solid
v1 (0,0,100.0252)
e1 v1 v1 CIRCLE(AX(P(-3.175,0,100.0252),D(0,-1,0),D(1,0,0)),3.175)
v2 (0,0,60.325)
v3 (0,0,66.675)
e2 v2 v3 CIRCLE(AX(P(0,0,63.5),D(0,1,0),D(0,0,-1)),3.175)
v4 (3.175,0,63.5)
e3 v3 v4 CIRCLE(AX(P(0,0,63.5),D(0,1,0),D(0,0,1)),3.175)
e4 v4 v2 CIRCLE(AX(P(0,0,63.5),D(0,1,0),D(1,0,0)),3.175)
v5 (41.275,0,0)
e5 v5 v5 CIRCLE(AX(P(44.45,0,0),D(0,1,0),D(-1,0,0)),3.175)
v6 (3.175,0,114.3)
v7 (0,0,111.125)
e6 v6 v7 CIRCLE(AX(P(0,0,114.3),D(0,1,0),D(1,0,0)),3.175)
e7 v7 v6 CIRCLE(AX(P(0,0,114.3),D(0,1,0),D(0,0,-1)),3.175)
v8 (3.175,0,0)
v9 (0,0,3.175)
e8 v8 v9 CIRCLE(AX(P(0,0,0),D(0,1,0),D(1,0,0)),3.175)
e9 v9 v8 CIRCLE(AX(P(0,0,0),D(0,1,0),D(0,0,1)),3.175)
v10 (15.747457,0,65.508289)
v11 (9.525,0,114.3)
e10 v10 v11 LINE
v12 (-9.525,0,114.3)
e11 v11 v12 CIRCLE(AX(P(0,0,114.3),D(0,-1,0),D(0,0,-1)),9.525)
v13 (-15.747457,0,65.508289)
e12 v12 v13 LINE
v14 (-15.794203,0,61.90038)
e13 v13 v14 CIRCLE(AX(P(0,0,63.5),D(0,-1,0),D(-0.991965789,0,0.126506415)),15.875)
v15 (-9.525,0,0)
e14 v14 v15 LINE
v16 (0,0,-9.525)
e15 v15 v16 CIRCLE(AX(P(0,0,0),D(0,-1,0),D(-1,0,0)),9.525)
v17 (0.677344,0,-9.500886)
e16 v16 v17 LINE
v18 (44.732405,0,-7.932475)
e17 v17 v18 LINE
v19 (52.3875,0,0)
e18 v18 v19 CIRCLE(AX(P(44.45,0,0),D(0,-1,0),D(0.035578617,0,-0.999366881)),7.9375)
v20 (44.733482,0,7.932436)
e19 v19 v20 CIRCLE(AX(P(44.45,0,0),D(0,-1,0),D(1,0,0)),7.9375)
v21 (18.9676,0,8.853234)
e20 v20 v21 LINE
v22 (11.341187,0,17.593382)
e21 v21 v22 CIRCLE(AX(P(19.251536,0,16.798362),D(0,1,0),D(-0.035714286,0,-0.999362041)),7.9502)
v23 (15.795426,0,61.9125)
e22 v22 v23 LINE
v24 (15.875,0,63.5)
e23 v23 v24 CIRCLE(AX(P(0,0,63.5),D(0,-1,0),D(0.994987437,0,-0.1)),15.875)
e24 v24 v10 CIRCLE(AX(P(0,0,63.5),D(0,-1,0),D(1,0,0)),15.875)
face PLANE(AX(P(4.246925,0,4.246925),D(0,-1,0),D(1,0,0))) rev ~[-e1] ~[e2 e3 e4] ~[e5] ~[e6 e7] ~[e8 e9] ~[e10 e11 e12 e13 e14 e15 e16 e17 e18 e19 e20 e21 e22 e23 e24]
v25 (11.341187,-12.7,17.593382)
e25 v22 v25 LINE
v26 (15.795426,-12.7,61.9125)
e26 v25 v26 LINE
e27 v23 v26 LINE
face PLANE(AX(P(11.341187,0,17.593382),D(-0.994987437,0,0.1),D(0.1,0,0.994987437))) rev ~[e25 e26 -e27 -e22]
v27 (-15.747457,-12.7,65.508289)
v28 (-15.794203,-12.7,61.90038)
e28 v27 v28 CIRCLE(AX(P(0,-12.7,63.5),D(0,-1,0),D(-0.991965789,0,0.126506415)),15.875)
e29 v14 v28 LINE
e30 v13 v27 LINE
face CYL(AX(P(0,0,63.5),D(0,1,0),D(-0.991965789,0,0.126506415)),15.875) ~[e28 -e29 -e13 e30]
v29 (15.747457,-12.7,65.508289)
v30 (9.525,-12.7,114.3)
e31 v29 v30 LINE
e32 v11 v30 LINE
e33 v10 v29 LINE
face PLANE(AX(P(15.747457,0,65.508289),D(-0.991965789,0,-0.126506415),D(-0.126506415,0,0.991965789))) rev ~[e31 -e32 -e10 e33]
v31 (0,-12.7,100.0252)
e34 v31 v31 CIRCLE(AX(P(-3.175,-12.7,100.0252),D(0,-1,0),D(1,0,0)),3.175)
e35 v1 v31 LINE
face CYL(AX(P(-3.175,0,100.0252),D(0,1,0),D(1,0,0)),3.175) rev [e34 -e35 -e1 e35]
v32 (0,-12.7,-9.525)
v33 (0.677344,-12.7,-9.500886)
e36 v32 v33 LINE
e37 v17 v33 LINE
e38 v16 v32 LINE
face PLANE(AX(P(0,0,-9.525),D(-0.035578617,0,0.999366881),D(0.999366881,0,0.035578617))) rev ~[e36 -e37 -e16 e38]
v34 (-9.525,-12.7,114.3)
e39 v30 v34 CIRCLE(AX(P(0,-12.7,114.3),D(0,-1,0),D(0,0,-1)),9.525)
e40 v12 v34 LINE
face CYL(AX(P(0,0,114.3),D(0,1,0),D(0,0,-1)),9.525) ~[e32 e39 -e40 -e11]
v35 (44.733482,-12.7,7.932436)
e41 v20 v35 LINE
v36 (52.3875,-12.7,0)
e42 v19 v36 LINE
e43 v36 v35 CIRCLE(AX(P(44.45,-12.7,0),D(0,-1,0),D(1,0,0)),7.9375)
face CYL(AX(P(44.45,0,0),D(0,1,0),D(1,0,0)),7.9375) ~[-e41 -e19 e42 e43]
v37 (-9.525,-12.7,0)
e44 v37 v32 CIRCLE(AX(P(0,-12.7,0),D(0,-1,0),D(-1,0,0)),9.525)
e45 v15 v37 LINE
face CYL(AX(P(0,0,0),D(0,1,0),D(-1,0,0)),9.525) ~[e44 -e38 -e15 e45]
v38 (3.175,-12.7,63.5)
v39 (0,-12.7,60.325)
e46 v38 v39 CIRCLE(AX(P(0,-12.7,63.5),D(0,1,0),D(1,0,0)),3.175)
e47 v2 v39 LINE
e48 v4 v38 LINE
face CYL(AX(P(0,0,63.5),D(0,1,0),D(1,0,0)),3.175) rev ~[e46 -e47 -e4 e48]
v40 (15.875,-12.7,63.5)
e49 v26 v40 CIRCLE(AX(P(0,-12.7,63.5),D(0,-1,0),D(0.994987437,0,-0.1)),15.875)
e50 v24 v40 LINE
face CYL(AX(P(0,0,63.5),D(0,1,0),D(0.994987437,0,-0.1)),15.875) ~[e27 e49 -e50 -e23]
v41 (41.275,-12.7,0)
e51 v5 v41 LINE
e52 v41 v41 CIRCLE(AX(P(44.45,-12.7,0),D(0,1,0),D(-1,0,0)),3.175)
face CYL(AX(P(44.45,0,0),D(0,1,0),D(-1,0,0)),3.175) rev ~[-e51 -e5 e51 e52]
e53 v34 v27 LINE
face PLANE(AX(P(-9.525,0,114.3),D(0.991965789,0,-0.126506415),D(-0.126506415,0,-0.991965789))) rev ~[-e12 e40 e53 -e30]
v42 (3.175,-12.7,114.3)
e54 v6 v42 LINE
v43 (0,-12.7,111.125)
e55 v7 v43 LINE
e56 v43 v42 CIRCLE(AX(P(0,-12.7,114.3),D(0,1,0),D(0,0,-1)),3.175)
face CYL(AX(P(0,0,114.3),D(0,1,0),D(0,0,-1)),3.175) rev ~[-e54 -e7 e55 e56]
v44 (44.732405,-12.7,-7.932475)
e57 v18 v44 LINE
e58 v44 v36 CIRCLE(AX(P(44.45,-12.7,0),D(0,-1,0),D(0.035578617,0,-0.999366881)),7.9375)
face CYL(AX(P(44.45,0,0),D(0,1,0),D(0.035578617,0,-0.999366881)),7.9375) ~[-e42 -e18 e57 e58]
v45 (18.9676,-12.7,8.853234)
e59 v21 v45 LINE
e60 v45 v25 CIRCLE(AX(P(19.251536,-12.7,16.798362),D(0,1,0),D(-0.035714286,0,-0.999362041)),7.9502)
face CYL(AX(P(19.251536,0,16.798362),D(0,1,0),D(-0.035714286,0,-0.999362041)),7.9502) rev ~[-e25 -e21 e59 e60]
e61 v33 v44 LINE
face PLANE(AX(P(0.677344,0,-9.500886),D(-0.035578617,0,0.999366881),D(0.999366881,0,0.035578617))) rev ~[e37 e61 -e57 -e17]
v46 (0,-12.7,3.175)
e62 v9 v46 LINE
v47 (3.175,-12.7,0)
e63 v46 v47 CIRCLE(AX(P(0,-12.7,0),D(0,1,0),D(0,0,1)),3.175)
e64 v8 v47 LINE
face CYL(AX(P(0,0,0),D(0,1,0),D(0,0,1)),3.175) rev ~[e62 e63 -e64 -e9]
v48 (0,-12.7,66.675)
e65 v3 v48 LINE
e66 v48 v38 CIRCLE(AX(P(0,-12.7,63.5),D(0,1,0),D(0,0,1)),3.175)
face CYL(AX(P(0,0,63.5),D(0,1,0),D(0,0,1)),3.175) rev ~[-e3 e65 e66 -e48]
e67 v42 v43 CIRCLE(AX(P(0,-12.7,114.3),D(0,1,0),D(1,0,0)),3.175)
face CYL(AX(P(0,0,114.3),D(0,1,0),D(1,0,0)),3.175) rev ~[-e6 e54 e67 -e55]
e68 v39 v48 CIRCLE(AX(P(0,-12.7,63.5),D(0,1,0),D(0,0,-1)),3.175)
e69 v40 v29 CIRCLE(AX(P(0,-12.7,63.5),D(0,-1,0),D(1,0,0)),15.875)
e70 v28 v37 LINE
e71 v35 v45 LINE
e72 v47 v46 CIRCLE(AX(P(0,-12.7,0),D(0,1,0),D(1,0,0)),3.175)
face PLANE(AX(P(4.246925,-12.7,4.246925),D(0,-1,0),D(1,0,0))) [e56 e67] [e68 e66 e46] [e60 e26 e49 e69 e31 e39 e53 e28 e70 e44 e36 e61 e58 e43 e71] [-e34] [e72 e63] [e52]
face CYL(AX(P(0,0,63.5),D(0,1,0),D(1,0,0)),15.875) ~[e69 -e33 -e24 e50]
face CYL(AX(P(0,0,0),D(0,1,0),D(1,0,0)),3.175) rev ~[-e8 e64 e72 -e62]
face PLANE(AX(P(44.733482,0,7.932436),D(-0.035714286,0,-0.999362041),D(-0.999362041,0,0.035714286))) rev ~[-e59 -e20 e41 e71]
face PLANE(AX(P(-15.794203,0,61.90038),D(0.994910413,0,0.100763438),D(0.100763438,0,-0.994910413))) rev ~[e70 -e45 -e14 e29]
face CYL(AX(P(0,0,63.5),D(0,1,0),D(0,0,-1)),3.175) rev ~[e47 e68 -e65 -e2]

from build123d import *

# Parameters (mm, degrees)
F0_R     = 3.175
F1_DEPTH = 12.7


# Not quite as in the source:
# - a feature names something its author has since deleted; it is built from what else it names


with BuildPart() as f1:
    # F0 (on Front) → F1 (new body)
    with BuildSketch(Plane.XZ):
        with BuildLine():
            Line((0, 9.525), (0, 3.175))
            ThreePointArc((0, 3.175), (2.2450640303, 2.2450640303), (3.175, 0))
            Line((3.175, 0), (9.525, 0))
            ThreePointArc((9.525, 0), (6.7351920908, 6.7351920908), (0, 9.525))
        make_face()
        with BuildLine():
            ThreePointArc((3.175, 0), (-2.2450640303, -2.2450640303), (0, 3.175))
            Line((0, 3.175), (0, 9.525))
            ThreePointArc((0, 9.525), (-6.7351920908, 6.7351920908), (-9.525, 0))
            ThreePointArc((-9.525, 0), (-6.7351920908, -6.7351920908), (0, -9.525))
            Line((0, -9.525), (0.6773435479, -9.500885786))
            ThreePointArc((0.6773435479, -9.500885786), (6.9705567315, -6.4912990883), (9.525, 0))
            Line((9.525, 0), (3.175, 0))
        make_face()
        with BuildLine():
            ThreePointArc((-9.525, 0), (-6.7351920908, 6.7351920908), (0, 9.525))
            Line((0, 9.525), (0, 47.625))
            ThreePointArc((0, 47.625), (-10.644756084, 51.722700101), (-15.7942028036, 61.9003804205))
            Line((-15.7942028036, 61.9003804205), (-9.525, 0))
        make_face()
        with BuildLine():
            Line((0, 47.625), (0, 9.525))
            ThreePointArc((0, 9.525), (6.7351920908, 6.7351920908), (9.525, 0))
            Line((9.525, 0), (36.5125, 0))
            ThreePointArc((36.5125, 0), (38.9384772185, 5.7120069047), (44.7334821429, 7.9324362036))
            Line((44.7334821429, 7.9324362036), (18.9676000005, 8.8532337108))
            ThreePointArc((18.9676000005, 8.8532337108), (13.2611998974, 11.5713591498), (11.3411865923, 17.5933818124))
            Line((11.3411865923, 17.5933818124), (15.7954255641, 61.9125))
            ThreePointArc((15.7954255641, 61.9125), (10.6492737428, 51.7267849017), (0, 47.625))
        make_face()
        with BuildLine():
            Line((36.5125, 0), (9.525, 0))
            ThreePointArc((9.525, 0), (6.9705567315, -6.4912990883), (0.6773435479, -9.500885786))
            Line((0.6773435479, -9.500885786), (44.7324052746, -7.9324746146))
            ThreePointArc((44.7324052746, -7.9324746146), (38.9380895153, -5.7116327839), (36.5125, 0))
        make_face()
        with BuildLine():
            ThreePointArc((44.7334821429, 7.9324362036), (38.9384772185, 5.7120069047), (36.5125, 0))
            ThreePointArc((36.5125, 0), (38.9380895153, -5.7116327839), (44.7324052746, -7.9324746146))
            ThreePointArc((44.7324052746, -7.9324746146), (50.1616327839, -5.5119104847), (52.3875, 0))
            ThreePointArc((52.3875, 0), (50.1620069047, 5.5115227815), (44.7334821429, 7.9324362036))
        make_face()
        with BuildLine():
            ThreePointArc((47.625, 0), (44.45, -3.175), (41.275, 0))
            ThreePointArc((41.275, 0), (44.45, 3.175), (47.625, 0))
        make_face(mode=Mode.SUBTRACT)
        with BuildLine():
            Line((0, 60.325), (0, 47.625))
            ThreePointArc((0, 47.625), (10.6492737428, 51.7267849017), (15.7954255641, 61.9125))
            ThreePointArc((15.7954255641, 61.9125), (15.8550939106, 62.7052534459), (15.875, 63.5))
            ThreePointArc((15.875, 63.5), (15.8430821396, 64.5061676396), (15.7474569047, 65.5082893304))
            ThreePointArc((15.7474569047, 65.5082893304), (10.4912828548, 75.4142187767), (0, 79.375))
            Line((0, 79.375), (0, 66.675))
            ThreePointArc((0, 66.675), (2.2450640303, 65.7450640303), (3.175, 63.5))
            ThreePointArc((3.175, 63.5), (2.2450640303, 61.2549359697), (0, 60.325))
        make_face()
        with BuildLine():
            ThreePointArc((-15.7942028036, 61.9003804205), (-10.644756084, 51.722700101), (0, 47.625))
            Line((0, 47.625), (0, 60.325))
            ThreePointArc((0, 60.325), (-3.175, 63.5), (0, 66.675))
            Line((0, 66.675), (0, 79.375))
            ThreePointArc((0, 79.375), (-10.4912828548, 75.4142187767), (-15.7474569047, 65.5082893304))
            ThreePointArc((-15.7474569047, 65.5082893304), (-15.873667691, 63.7056672947), (-15.7942028036, 61.9003804205))
        make_face()
        with BuildLine():
            Line((0, 100.0252), (0, 79.375))
            ThreePointArc((0, 79.375), (10.4912828548, 75.4142187767), (15.7474569047, 65.5082893304))
            Line((15.7474569047, 65.5082893304), (9.525, 114.3))
            ThreePointArc((9.525, 114.3), (6.7351920908, 107.5648079092), (0, 104.775))
            Line((0, 104.775), (0, 100.0252))
        make_face()
        with BuildLine():
            Line((-9.525, 114.3), (-15.7474569047, 65.5082893304))
            ThreePointArc((-15.7474569047, 65.5082893304), (-10.4912828548, 75.4142187767), (0, 79.375))
            Line((0, 79.375), (0, 100.0252))
            Line((0, 100.0252), (0, 104.775))
            ThreePointArc((0, 104.775), (-6.7351920908, 107.5648079092), (-9.525, 114.3))
        make_face()
        with Locations((-3.175, 100.0252)):
            Circle(F0_R, mode=Mode.SUBTRACT)
        with BuildLine():
            ThreePointArc((9.525, 114.3), (0, 123.825), (-9.525, 114.3))
            ThreePointArc((-9.525, 114.3), (-6.7351920908, 107.5648079092), (0, 104.775))
            ThreePointArc((0, 104.775), (6.7351920908, 107.5648079092), (9.525, 114.3))
        make_face()
        with BuildLine():
            ThreePointArc((3.175, 114.3), (2.2450640303, 112.0549359697), (0, 111.125))
            ThreePointArc((0, 111.125), (-2.2450640303, 116.5450640303), (3.175, 114.3))
        make_face(mode=Mode.SUBTRACT)
    extrude(amount=F1_DEPTH)


solid = f1.part
